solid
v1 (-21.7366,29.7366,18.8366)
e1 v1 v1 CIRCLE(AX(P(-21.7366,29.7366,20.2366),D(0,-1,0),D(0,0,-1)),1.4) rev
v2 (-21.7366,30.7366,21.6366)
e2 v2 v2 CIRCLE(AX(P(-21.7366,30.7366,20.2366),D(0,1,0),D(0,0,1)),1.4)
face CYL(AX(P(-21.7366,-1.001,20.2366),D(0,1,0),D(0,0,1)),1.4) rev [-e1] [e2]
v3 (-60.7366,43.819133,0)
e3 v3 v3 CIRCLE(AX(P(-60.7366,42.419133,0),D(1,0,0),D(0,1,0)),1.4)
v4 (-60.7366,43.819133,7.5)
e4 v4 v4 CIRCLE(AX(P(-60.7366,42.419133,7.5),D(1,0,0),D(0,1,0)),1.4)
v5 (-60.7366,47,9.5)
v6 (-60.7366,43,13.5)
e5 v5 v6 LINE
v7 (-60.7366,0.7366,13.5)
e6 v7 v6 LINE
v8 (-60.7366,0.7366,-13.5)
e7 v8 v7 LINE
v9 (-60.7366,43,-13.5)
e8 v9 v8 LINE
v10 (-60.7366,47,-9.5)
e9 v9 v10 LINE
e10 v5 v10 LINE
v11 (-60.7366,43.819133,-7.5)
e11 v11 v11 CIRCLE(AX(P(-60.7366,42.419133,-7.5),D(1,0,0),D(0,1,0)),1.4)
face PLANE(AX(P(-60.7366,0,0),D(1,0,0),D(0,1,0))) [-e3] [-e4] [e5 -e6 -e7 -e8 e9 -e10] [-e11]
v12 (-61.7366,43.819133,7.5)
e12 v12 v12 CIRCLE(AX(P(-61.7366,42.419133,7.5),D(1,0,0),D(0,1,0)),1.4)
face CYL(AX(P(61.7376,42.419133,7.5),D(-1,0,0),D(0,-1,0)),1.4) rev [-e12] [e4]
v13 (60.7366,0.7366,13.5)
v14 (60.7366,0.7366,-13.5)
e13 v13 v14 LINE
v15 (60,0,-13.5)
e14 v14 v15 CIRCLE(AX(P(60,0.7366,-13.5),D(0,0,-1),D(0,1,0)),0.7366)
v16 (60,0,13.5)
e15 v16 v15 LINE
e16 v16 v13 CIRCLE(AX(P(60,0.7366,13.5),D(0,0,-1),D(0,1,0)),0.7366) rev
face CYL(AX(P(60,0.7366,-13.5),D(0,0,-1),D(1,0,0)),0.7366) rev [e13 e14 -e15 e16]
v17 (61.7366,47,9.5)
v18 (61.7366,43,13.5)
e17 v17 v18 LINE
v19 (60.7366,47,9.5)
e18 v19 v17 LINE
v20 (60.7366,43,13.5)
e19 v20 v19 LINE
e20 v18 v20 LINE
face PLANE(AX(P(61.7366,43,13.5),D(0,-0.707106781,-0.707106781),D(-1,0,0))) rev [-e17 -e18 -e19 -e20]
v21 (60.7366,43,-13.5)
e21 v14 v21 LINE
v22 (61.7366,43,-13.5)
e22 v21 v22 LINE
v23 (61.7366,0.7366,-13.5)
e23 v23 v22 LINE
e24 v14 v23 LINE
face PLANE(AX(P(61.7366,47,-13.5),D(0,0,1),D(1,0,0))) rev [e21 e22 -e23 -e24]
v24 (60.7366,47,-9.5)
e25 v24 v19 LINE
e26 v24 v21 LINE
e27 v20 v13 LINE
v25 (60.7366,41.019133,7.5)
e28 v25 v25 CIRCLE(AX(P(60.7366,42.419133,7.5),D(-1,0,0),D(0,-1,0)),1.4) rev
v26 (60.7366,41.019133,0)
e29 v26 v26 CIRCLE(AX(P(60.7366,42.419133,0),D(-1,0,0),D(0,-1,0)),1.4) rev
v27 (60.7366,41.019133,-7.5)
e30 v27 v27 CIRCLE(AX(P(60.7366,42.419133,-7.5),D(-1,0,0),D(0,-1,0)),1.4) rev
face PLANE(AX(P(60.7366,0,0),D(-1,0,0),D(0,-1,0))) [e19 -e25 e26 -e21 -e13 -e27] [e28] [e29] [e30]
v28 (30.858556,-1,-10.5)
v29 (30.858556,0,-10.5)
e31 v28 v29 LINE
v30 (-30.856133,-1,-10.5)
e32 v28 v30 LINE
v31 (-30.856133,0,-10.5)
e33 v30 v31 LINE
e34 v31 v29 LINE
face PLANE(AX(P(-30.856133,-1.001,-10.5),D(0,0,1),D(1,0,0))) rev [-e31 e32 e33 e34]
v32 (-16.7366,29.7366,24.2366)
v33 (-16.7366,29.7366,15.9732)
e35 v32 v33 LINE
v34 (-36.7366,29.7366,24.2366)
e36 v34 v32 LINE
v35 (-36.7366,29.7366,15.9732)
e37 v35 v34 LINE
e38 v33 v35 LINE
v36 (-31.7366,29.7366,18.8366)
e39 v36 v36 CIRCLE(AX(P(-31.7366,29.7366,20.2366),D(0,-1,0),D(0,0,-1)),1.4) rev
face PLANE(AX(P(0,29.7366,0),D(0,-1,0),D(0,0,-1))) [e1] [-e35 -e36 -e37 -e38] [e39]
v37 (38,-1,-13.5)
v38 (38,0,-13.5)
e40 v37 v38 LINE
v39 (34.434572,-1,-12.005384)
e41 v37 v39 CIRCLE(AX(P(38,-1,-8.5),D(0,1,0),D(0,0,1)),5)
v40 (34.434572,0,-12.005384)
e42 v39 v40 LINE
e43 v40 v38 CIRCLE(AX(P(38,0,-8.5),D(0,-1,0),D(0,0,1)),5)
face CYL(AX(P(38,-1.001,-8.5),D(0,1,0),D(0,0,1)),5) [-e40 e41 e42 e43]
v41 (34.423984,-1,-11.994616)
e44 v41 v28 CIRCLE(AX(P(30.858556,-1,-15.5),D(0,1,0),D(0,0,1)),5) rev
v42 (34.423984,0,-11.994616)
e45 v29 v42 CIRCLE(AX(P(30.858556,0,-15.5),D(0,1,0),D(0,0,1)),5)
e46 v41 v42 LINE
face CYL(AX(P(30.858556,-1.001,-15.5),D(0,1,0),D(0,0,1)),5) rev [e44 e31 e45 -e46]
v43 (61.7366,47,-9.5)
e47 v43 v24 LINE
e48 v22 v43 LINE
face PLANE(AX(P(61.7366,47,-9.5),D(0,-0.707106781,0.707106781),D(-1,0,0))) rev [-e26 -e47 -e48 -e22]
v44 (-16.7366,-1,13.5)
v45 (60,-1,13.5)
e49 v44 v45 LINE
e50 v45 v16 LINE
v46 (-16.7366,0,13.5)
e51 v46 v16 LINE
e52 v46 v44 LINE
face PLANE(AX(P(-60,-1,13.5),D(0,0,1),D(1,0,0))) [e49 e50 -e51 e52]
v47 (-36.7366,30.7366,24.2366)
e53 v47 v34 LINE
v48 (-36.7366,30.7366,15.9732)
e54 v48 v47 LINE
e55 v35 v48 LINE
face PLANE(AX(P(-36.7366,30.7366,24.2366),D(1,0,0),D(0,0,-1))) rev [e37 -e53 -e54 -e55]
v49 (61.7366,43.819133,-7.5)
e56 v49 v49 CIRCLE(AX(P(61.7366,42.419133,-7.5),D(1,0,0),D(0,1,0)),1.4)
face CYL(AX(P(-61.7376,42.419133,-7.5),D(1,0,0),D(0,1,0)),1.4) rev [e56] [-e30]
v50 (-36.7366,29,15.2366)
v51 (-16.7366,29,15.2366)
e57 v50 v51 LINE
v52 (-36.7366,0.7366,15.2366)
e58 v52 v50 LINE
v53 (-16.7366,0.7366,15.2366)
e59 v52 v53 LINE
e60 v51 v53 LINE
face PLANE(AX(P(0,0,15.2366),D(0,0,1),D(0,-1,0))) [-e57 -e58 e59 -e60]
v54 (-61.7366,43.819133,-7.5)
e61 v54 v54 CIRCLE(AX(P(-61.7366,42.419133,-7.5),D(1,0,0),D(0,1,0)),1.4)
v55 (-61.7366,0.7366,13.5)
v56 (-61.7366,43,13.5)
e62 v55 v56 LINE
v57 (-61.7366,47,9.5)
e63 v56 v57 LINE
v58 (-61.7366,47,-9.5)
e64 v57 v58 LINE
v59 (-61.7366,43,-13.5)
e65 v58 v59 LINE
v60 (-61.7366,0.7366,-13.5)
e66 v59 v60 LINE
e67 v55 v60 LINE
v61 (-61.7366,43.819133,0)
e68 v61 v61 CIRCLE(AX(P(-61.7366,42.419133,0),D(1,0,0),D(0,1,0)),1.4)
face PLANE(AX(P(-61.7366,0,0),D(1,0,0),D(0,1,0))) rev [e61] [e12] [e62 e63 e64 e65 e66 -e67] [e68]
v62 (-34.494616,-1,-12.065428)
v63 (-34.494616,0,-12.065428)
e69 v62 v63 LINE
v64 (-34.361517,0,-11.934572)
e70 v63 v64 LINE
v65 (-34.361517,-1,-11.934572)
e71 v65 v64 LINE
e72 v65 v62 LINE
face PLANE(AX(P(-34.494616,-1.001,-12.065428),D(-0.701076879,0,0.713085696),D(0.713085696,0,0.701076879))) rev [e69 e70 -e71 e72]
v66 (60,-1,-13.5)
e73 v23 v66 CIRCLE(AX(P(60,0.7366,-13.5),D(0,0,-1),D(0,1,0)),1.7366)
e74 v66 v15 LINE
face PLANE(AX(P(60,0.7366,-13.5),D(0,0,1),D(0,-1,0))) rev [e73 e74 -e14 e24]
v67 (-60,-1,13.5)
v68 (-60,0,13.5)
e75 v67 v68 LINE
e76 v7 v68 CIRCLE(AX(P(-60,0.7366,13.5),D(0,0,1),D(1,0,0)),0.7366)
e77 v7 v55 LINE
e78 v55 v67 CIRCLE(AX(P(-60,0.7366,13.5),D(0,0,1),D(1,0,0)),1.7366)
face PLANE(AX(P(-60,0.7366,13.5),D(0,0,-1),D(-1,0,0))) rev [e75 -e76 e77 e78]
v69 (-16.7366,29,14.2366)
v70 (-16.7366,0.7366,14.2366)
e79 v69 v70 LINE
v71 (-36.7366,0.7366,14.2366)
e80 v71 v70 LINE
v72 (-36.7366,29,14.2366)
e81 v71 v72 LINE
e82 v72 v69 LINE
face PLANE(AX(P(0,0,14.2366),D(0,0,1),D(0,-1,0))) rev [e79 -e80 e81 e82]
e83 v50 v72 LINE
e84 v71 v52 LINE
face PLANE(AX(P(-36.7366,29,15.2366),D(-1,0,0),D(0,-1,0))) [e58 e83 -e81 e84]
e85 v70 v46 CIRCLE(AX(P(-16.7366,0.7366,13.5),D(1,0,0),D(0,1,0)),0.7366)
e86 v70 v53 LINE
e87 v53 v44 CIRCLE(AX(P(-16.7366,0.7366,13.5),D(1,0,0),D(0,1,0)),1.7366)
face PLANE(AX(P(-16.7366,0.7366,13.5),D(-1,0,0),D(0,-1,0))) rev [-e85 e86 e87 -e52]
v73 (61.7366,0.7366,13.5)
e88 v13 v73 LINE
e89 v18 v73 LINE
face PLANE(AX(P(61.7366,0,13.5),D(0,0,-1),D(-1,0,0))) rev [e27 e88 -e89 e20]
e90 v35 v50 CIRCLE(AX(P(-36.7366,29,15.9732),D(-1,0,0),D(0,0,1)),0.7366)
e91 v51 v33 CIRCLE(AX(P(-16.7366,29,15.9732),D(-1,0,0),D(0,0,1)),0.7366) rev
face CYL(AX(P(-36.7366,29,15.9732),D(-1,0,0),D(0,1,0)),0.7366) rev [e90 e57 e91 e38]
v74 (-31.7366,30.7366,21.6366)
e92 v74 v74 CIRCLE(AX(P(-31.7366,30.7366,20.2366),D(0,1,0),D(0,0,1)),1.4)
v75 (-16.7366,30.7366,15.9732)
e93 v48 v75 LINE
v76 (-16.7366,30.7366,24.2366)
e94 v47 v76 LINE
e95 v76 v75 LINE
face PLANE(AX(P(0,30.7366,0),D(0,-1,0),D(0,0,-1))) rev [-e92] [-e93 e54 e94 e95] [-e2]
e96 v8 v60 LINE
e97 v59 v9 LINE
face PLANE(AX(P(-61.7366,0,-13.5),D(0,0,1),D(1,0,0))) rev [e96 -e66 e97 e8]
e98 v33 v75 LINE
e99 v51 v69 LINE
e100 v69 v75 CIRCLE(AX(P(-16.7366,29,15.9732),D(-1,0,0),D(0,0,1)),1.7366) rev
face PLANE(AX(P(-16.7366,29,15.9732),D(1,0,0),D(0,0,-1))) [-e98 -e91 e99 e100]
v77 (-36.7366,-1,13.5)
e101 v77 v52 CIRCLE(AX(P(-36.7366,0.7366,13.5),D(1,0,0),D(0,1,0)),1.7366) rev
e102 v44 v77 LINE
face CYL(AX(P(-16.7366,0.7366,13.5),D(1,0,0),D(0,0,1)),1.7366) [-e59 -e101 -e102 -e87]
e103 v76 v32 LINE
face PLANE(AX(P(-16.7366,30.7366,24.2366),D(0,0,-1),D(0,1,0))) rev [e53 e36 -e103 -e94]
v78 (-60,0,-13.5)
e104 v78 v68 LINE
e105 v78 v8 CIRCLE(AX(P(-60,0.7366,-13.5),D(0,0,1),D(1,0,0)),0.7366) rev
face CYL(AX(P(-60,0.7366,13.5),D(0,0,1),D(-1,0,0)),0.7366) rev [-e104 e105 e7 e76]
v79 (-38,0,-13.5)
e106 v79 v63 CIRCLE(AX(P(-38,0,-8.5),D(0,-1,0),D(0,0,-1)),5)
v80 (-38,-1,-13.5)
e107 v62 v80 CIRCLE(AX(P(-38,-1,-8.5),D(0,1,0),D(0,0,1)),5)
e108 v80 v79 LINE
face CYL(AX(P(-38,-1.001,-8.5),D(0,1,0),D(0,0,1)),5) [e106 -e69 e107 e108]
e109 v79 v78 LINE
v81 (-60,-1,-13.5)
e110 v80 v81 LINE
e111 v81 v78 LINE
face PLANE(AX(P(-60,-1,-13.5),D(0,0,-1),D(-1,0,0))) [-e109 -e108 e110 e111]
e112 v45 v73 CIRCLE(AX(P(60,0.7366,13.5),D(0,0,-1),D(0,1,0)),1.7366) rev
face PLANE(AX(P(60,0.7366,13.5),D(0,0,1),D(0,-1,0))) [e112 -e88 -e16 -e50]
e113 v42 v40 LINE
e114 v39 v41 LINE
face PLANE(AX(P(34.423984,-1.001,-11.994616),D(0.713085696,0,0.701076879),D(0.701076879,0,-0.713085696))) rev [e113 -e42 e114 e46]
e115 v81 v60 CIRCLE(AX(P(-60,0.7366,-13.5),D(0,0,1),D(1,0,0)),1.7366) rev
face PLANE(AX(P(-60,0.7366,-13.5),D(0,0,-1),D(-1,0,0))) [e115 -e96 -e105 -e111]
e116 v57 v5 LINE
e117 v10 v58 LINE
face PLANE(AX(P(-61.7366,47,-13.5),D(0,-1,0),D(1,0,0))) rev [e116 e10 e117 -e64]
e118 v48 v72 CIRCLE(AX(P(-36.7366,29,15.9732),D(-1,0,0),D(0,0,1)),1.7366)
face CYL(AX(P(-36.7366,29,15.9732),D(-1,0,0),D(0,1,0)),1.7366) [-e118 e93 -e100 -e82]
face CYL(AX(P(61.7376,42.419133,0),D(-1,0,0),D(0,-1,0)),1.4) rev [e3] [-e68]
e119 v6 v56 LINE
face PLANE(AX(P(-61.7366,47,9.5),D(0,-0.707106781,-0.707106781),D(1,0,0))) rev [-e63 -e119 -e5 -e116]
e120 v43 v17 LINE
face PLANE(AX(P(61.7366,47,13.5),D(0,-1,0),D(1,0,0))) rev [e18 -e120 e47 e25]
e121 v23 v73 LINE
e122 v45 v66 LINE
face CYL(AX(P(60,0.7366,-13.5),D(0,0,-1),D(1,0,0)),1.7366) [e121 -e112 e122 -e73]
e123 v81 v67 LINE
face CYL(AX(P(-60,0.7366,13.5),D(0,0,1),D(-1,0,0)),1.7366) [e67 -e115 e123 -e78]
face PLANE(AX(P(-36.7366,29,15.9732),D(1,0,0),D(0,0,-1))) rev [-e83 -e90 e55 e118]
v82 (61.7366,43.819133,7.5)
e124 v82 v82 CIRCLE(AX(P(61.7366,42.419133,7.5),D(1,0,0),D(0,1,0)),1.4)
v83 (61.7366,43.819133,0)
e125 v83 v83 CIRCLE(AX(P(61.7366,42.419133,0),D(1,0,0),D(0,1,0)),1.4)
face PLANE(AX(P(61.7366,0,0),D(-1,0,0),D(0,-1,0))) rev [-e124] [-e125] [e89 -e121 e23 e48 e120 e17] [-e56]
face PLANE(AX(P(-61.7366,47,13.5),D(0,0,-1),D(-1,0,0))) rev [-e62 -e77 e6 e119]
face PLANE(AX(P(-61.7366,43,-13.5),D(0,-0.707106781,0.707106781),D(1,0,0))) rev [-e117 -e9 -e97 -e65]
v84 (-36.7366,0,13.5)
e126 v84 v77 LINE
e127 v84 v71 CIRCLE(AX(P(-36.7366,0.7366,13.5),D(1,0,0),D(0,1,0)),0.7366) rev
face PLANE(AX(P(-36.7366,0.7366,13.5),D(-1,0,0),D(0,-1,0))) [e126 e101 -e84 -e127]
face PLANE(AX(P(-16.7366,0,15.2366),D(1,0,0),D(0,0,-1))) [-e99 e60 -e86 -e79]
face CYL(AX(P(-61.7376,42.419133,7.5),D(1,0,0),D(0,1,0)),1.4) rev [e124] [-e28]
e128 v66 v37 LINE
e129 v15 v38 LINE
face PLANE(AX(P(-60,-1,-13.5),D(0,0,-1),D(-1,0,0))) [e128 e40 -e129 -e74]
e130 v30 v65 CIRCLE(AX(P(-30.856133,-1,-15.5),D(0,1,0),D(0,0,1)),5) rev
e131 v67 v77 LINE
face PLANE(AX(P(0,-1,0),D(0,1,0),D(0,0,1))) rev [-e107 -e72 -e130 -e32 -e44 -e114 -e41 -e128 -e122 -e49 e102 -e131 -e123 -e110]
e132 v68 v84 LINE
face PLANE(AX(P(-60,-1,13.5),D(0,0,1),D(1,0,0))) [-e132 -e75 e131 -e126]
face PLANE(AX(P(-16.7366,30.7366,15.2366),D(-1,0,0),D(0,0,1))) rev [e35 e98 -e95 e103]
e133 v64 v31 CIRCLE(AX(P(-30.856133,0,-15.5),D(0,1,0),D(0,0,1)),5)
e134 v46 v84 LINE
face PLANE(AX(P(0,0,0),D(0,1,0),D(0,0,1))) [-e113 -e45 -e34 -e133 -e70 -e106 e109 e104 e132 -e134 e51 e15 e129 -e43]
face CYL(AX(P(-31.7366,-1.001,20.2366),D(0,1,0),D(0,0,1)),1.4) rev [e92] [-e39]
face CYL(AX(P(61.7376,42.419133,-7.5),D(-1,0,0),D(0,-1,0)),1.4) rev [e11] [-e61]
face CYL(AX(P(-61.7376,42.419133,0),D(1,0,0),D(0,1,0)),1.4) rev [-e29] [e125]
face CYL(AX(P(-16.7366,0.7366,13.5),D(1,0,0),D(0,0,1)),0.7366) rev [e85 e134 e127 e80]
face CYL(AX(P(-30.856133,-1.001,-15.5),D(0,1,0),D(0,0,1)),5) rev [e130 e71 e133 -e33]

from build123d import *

# Parameters (mm, degrees)
SKETCH6_W               = 120
SKETCH6_H               = 27
BASE_FLANGE2_DEPTH      = 1
EDGE_FLANGE1_DEPTH      = 27
EDGE_FLANGE1_BEND_DEPTH = 27
EDGE_FLANGE2_DEPTH      = 20
EDGE_FLANGE3_DEPTH      = 20
CUT_EXTRUDE1_REACH      = 136.321
SKETCH26_R              = 1.4
CUT_EXTRUDE2_REACH      = 75.526
SKETCH27_R              = 1.4
BREAK_CORNER1_START     = -61.7366
BREAK_CORNER1_DEPTH     = 123.4732
CUT_EXTRUDE3_REACH      = 83.289


# Read off the part's stored shape, not the designer's step: Break-Corner1
# Sheet-metal steps are written as plain solids
with BuildPart() as part:
    # Sketch6 → Base-Flange2 (new body)
    with BuildSketch(Plane(origin=(0, 0, 0), x_dir=(1, 0, 0), z_dir=(0, 1, 0))):
        Rectangle(SKETCH6_W, SKETCH6_H)
    extrude(amount=-BASE_FLANGE2_DEPTH)

    # Edge-Flange1 section (across the edge) → Edge-Flange1 (add)
    with BuildSketch(Plane(origin=(-60.7366, 0, -13.5), x_dir=(1, 0, 0), z_dir=(0, 0, 1))):
        with BuildLine():
            Line((-1, 0.7366), (-1, 47))
            Line((-1, 47), (0, 47))
            Line((0, 47), (0, 0.7366))
            ThreePointArc((0, 0.7366), (0.215745145, 0.215745145), (0.7366, 0))
            Line((0.7366, 0), (0.7366, -1))
            ThreePointArc((0.7366, -1), (-0.491361636, -0.491361636), (-1, 0.7366))
        make_face()
    extrude(amount=EDGE_FLANGE1_DEPTH)

    # Edge-Flange1 section 2 (across the edge) → Edge-Flange1 bend (add)
    with BuildSketch(Plane(origin=(60.7366, 0, 13.5), x_dir=(-1, 0, 0), z_dir=(0, 0, -1))):
        with BuildLine():
            Line((-1, 0.7366), (-1, 47))
            Line((-1, 47), (0, 47))
            Line((0, 47), (0, 0.7366))
            ThreePointArc((0, 0.7366), (0.215745145, 0.215745145), (0.7366, 0))
            Line((0.7366, 0), (0.7366, -1))
            ThreePointArc((0.7366, -1), (-0.491361636, -0.491361636), (-1, 0.7366))
        make_face()
    extrude(amount=EDGE_FLANGE1_BEND_DEPTH)

    # Edge-Flange2 section (across the edge) → Edge-Flange2 (add)
    with BuildSketch(Plane(origin=(-36.7366, 0, 14.2366), x_dir=(0, 0, -1), z_dir=(1, 0, 0))):
        with BuildLine():
            Line((-1, 0.7366), (-1, 29))
            Line((-1, 29), (0, 29))
            Line((0, 29), (0, 0.7366))
            ThreePointArc((0, 0.7366), (0.215745145, 0.215745145), (0.7366, 0))
            Line((0.7366, 0), (0.7366, -1))
            ThreePointArc((0.7366, -1), (-0.491361636, -0.491361636), (-1, 0.7366))
        make_face()
    extrude(amount=EDGE_FLANGE2_DEPTH)

    # Edge-Flange3 section (across the edge) → Edge-Flange3 (add)
    with BuildSketch(Plane(origin=(-16.7366, 29.7366, 15.2366), x_dir=(0, -1, 0), z_dir=(-1, 0, 0))):
        with BuildLine():
            Line((-1, 0.7366), (-1, 9))
            Line((-1, 9), (0, 9))
            Line((0, 9), (0, 0.7366))
            ThreePointArc((0, 0.7366), (0.215745145, 0.215745145), (0.7366, 0))
            Line((0.7366, 0), (0.7366, -1))
            ThreePointArc((0.7366, -1), (-0.491361636, -0.491361636), (-1, 0.7366))
        make_face()
    extrude(amount=EDGE_FLANGE3_DEPTH)

    # Sketch26 → Cut-Extrude1 (cut, up to next)
    with BuildSketch(Plane(origin=(61.7366, 0, 0), x_dir=(0, 0, -1), z_dir=(1, 0, 0)), mode=Mode.PRIVATE) as cut_extrude1_sk1:
        with Locations(Location((-7.5, 42.419132502, 0), (0, 0, 90))):
            Circle(SKETCH26_R)
    cut_extrude1_tool1 = extrude(cut_extrude1_sk1.sketch, amount=-CUT_EXTRUDE1_REACH, mode=Mode.PRIVATE) & part.part
    # Sketch26 → Cut-Extrude1 (cut, up to next)
    with BuildSketch(Plane(origin=(61.7366, 0, 0), x_dir=(0, 0, -1), z_dir=(1, 0, 0)), mode=Mode.PRIVATE) as cut_extrude1_sk2:
        with Locations(Location((0, 42.419132502, 0), (0, 0, 90))):
            Circle(SKETCH26_R)
    cut_extrude1_tool2 = extrude(cut_extrude1_sk2.sketch, amount=-CUT_EXTRUDE1_REACH, mode=Mode.PRIVATE) & part.part
    # Sketch26 → Cut-Extrude1 (cut, up to next)
    with BuildSketch(Plane(origin=(61.7366, 0, 0), x_dir=(0, 0, -1), z_dir=(1, 0, 0)), mode=Mode.PRIVATE) as cut_extrude1_sk3:
        with Locations(Location((7.5, 42.419132502, 0), (0, 0, 90))):
            Circle(SKETCH26_R)
    cut_extrude1_tool3 = extrude(cut_extrude1_sk3.sketch, amount=-CUT_EXTRUDE1_REACH, mode=Mode.PRIVATE) & part.part
    cut_extrude1_1 = cut_extrude1_tool1.solids().sort_by_distance((61.7366, 42.419133, 7.5))[0]
    add(cut_extrude1_1, mode=Mode.SUBTRACT)
    cut_extrude1_2 = cut_extrude1_tool2.solids().sort_by_distance((61.7366, 42.419133, 0))[0]
    add(cut_extrude1_2, mode=Mode.SUBTRACT)
    cut_extrude1_3 = cut_extrude1_tool3.solids().sort_by_distance((61.7366, 42.419133, -7.5))[0]
    add(cut_extrude1_3, mode=Mode.SUBTRACT)
    cut_extrude1 = cut_extrude1_1 + cut_extrude1_2 + cut_extrude1_3  # Cut-Extrude1 as one shape, for the pattern or mirror that repeats it

    # Mirror1: Cut-Extrude1 across plane
    add(cut_extrude1.mirror(Plane(origin=(0, 0, 0), x_dir=(0, 0, 1), z_dir=(1, 0, 0))), mode=Mode.SUBTRACT)

    # Sketch27 → Cut-Extrude2 (cut, up to next)
    with BuildSketch(Plane(origin=(0, 30.7366, 0), x_dir=(1, 0, 0), z_dir=(0, 1, 0)), mode=Mode.PRIVATE) as cut_extrude2_sk1:
        with Locations(Location((-31.7366, -20.2366, 0), (0, 0, 270))):
            Circle(SKETCH27_R)
    cut_extrude2_tool1 = extrude(cut_extrude2_sk1.sketch, amount=-CUT_EXTRUDE2_REACH, mode=Mode.PRIVATE) & part.part
    # Sketch27 → Cut-Extrude2 (cut, up to next)
    with BuildSketch(Plane(origin=(0, 30.7366, 0), x_dir=(1, 0, 0), z_dir=(0, 1, 0)), mode=Mode.PRIVATE) as cut_extrude2_sk2:
        with Locations(Location((-21.7366, -20.2366, 0), (0, 0, 270))):
            Circle(SKETCH27_R)
    cut_extrude2_tool2 = extrude(cut_extrude2_sk2.sketch, amount=-CUT_EXTRUDE2_REACH, mode=Mode.PRIVATE) & part.part
    add(cut_extrude2_tool1.solids().sort_by_distance((-31.7366, 30.7366, 20.2366))[0], mode=Mode.SUBTRACT)
    add(cut_extrude2_tool2.solids().sort_by_distance((-21.7366, 30.7366, 20.2366))[0], mode=Mode.SUBTRACT)

    # Break-Corner1 outline → Break-Corner1 (cut)
    with BuildSketch(Plane.YZ.offset(BREAK_CORNER1_START)):
        Polygon((47, -13.5), (47, -9.5), (43, -13.5), align=None)
        Polygon((43, 13.5), (47, 9.5), (47, 13.5), align=None)
    extrude(amount=BREAK_CORNER1_DEPTH, mode=Mode.SUBTRACT)

    # Sketch29 → Cut-Extrude3 (cut, up to next)
    with BuildSketch(Plane(origin=(0, 0, 0), x_dir=(1, 0, 0), z_dir=(0, 1, 0)), mode=Mode.PRIVATE) as cut_extrude3_sk1:
        with BuildLine():
            Line((-34.494615607, 12.065428481), (-34.361517182, 11.934571519))
            ThreePointArc((-34.361517182, 11.934571519), (-32.749919682, 10.872519994), (-30.856132789, 10.5))
            Line((-30.856132789, 10.5), (30.858555604, 10.5))
            ThreePointArc((30.858555604, 10.5), (32.791568542, 10.888767954), (34.423984085, 11.994615607))
            Line((34.423984085, 11.994615607), (34.434571519, 12.005384393))
            ThreePointArc((34.434571519, 12.005384393), (36.066987062, 13.111232046), (38, 13.5))
            Line((38, 13.5), (-38, 13.5))
            ThreePointArc((-38, 13.5), (-36.106213107, 13.127480006), (-34.494615607, 12.065428481))
        make_face()
    cut_extrude3_tool1 = extrude(cut_extrude3_sk1.sketch, amount=-CUT_EXTRUDE3_REACH, mode=Mode.PRIVATE) & part.part
    add(cut_extrude3_tool1.solids().sort_by_distance((0.000586, 0, -12.034279))[0], mode=Mode.SUBTRACT)


solid = part.part
